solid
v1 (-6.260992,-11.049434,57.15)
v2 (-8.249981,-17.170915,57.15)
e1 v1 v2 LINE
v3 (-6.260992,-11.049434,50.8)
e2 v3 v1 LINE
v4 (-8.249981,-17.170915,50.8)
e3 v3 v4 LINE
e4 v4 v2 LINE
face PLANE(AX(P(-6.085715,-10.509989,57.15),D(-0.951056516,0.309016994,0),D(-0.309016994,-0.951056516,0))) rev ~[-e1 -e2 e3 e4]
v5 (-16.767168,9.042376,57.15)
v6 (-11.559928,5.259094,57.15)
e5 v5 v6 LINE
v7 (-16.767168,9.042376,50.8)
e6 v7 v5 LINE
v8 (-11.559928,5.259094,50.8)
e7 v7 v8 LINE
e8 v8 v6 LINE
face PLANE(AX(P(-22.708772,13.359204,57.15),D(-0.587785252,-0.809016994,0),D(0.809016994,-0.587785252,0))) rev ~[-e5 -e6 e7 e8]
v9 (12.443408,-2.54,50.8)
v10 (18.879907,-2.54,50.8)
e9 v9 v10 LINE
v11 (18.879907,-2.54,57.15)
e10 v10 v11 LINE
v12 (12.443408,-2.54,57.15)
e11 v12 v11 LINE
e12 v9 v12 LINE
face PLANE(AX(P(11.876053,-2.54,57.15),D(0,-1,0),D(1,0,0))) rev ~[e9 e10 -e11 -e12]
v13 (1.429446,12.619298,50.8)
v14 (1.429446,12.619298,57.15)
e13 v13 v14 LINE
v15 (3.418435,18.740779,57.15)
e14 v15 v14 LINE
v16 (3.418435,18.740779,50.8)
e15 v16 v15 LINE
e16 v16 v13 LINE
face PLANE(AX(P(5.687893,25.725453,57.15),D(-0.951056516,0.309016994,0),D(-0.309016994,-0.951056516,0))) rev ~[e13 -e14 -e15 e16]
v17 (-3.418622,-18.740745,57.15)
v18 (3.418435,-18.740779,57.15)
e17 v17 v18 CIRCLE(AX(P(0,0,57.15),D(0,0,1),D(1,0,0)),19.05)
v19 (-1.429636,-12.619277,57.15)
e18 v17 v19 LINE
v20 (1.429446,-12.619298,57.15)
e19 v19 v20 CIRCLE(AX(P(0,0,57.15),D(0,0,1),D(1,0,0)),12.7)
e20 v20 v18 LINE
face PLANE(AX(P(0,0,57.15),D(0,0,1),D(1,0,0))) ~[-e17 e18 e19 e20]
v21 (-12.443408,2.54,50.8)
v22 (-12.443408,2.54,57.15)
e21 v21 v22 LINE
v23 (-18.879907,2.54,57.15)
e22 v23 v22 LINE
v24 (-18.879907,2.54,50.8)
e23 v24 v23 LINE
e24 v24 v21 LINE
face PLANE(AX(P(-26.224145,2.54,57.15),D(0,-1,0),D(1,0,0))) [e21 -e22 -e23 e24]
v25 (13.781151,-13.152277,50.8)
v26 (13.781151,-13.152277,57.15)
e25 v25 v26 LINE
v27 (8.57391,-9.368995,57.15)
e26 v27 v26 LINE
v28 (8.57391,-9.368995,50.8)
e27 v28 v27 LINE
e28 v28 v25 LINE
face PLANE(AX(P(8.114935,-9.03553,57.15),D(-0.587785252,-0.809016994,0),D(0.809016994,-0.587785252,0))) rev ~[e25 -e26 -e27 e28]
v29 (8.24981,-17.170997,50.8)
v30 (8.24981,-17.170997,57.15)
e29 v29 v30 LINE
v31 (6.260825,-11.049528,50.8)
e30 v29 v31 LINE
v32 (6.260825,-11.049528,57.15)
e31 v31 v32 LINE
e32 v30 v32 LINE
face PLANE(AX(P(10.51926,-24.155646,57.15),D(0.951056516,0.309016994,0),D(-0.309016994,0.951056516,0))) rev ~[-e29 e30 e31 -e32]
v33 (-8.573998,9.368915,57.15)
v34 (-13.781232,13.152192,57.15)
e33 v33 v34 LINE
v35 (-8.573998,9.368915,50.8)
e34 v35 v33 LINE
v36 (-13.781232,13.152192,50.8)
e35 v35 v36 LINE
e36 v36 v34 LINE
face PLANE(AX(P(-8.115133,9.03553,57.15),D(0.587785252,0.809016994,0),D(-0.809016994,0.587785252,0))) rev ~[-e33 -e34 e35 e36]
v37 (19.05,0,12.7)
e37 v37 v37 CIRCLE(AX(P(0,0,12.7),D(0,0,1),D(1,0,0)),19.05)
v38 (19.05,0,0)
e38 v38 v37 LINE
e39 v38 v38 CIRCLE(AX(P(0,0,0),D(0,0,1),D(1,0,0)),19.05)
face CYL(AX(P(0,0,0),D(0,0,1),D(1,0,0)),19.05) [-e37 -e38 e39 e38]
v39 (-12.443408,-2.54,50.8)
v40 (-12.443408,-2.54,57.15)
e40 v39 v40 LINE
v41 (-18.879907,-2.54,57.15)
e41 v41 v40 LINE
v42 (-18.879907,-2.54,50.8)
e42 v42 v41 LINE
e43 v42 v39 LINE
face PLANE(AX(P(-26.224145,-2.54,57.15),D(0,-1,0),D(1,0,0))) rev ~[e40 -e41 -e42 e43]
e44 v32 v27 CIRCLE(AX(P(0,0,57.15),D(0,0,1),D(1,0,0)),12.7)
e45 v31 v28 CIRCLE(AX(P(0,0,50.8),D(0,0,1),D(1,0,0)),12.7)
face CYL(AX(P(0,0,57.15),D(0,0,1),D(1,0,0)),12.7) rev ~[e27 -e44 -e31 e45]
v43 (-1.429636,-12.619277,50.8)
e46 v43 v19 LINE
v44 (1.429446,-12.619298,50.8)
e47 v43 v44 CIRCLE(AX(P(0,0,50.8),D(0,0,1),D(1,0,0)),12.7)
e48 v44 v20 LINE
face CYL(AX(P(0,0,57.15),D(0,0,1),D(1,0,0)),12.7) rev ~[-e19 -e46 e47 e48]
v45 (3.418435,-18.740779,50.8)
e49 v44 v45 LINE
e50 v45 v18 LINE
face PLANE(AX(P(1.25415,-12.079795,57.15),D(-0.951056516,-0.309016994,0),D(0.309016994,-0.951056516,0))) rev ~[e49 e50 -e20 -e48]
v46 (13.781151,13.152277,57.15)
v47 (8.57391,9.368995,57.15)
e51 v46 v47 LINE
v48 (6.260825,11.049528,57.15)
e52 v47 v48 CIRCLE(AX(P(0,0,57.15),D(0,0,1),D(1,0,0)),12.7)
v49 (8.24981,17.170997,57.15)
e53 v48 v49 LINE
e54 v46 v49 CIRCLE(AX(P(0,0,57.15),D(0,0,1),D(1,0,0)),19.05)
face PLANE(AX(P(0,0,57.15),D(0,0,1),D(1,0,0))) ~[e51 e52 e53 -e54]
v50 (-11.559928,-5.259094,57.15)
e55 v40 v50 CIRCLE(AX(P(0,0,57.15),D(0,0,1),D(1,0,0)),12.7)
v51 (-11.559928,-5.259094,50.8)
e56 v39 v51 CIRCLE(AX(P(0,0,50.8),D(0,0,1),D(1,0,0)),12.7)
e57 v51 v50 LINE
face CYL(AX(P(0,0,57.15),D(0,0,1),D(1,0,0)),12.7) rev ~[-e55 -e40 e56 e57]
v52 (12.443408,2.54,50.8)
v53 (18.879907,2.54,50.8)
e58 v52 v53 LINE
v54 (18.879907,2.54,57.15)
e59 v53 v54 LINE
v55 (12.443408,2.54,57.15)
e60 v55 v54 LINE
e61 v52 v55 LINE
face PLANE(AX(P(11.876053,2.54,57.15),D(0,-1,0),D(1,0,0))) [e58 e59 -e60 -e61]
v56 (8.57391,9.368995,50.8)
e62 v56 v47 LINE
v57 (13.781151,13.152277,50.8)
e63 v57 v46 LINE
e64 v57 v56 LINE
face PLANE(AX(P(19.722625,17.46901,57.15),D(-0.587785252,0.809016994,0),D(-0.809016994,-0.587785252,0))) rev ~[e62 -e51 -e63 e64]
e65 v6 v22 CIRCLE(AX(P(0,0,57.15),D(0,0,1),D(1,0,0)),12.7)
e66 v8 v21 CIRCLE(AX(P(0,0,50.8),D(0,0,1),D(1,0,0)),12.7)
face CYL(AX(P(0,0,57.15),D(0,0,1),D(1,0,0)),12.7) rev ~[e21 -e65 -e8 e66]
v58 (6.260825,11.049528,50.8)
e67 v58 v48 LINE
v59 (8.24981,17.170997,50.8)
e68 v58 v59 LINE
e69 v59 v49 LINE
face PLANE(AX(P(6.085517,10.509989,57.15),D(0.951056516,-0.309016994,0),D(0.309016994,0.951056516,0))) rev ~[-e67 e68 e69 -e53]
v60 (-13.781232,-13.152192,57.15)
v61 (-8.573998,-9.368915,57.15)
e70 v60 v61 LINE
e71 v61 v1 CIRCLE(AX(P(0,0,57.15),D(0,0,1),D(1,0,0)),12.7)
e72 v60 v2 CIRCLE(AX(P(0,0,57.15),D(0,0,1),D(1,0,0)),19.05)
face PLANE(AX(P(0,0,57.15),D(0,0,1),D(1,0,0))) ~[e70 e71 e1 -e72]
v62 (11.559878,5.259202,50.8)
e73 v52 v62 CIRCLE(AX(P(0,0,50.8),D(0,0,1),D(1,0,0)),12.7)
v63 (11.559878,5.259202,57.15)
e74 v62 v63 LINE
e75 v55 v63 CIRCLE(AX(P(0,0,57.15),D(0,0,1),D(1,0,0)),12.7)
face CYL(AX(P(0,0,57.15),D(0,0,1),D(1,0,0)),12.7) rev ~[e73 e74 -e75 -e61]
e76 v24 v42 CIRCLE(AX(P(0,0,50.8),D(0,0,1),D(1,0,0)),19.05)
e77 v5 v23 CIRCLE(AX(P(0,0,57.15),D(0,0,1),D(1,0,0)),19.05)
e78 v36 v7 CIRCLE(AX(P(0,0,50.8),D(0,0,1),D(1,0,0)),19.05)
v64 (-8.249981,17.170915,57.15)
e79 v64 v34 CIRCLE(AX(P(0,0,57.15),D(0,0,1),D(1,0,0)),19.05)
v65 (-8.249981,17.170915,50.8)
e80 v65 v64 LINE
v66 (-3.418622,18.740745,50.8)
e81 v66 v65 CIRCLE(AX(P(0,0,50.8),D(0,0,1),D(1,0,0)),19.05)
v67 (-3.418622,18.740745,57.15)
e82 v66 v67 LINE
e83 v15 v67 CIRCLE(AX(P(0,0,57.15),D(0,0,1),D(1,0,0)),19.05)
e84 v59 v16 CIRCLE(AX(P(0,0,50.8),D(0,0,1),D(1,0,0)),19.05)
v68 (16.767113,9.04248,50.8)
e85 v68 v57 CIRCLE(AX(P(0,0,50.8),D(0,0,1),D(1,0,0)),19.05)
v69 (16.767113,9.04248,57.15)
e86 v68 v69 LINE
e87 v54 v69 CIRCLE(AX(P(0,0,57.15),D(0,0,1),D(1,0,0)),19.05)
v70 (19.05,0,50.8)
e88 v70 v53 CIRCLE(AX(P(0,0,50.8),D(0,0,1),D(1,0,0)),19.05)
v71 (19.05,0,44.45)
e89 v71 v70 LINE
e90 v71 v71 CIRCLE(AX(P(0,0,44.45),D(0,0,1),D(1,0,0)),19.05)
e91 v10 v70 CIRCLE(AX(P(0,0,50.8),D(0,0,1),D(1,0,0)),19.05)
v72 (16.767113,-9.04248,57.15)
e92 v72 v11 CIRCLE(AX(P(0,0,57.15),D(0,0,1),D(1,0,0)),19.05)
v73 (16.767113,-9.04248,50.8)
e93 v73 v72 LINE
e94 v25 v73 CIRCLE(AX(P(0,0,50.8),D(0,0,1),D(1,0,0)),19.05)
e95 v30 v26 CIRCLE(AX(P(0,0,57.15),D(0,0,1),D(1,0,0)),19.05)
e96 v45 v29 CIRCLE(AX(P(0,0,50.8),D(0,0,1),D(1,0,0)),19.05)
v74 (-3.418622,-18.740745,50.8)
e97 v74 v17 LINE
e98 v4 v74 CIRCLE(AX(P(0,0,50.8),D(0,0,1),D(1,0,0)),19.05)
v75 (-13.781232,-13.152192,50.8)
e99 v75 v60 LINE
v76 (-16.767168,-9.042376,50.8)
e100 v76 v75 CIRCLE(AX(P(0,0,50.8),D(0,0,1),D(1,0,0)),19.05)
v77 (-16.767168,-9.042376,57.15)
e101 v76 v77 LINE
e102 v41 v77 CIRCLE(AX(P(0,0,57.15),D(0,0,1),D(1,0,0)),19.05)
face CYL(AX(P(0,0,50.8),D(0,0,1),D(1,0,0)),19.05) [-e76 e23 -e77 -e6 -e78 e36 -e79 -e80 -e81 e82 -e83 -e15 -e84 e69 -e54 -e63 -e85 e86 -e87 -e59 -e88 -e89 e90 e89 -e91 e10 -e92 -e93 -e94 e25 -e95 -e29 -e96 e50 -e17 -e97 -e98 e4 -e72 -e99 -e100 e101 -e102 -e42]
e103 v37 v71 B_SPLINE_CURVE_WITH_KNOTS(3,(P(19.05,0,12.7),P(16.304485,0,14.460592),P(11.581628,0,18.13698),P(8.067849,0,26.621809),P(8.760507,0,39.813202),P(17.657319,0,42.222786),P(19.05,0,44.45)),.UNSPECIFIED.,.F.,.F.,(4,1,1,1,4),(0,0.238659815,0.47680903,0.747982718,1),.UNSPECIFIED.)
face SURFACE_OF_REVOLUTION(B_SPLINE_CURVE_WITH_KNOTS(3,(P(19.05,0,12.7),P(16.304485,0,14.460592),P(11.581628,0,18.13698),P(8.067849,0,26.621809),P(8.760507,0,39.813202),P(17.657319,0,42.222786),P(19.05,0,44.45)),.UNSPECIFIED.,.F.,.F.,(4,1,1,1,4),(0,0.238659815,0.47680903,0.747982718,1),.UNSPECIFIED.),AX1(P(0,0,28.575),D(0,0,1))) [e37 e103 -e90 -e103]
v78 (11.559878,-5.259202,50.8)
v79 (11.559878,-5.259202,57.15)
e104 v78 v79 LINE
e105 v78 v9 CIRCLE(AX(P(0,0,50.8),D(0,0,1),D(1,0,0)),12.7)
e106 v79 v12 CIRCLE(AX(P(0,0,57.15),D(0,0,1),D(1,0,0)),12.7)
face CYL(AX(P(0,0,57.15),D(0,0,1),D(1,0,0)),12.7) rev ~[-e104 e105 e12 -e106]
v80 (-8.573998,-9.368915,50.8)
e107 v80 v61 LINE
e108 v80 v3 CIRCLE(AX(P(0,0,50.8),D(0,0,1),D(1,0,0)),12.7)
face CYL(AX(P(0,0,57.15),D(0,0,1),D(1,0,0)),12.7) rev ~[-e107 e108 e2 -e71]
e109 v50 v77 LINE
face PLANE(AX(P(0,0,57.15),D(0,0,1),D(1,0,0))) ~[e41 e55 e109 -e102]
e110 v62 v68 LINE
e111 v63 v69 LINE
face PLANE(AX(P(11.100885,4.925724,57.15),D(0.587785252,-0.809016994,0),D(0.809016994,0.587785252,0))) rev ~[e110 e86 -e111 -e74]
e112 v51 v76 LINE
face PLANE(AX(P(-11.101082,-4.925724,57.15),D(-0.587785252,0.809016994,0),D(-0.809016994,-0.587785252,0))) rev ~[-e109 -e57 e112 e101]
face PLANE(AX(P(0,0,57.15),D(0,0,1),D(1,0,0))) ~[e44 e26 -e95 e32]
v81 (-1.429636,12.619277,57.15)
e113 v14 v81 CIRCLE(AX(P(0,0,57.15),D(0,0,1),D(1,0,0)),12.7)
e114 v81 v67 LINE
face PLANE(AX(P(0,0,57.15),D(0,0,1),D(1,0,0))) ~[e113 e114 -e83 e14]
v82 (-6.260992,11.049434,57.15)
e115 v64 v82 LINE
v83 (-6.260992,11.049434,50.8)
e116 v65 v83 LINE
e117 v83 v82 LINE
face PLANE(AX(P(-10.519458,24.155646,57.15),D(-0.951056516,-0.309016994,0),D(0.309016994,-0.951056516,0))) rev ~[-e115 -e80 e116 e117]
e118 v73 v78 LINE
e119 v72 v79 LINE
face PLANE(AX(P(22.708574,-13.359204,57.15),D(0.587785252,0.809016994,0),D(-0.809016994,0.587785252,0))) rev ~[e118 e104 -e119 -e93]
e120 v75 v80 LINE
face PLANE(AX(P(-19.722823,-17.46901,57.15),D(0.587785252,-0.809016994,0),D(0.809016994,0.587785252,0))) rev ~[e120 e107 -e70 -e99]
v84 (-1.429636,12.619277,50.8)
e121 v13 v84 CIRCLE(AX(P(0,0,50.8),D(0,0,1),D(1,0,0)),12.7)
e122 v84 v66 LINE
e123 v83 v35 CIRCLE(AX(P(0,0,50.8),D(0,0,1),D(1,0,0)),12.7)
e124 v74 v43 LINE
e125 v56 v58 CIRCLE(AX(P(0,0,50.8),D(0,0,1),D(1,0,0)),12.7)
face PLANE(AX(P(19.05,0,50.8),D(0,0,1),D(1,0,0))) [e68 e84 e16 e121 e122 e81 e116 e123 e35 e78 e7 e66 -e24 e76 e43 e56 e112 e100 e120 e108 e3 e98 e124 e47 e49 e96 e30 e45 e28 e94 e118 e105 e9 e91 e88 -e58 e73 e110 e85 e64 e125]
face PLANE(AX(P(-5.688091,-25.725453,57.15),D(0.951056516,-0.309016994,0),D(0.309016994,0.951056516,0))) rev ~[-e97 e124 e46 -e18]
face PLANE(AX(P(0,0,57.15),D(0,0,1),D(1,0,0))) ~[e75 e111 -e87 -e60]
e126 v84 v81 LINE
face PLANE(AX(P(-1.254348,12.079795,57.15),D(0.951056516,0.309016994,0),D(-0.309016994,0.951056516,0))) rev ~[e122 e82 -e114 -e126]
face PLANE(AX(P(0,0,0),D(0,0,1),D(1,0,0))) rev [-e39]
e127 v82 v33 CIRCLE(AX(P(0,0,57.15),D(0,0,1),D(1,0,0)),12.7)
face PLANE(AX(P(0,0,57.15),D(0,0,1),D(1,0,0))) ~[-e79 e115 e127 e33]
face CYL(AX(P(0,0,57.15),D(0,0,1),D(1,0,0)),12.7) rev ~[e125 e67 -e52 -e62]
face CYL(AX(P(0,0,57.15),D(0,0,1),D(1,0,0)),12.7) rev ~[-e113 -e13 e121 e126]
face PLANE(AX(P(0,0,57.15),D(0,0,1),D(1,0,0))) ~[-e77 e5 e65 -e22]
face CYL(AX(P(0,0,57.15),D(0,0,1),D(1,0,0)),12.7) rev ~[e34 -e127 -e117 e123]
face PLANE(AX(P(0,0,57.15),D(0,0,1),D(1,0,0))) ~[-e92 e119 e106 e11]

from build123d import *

# Parameters (mm, degrees)
F0_W     = 19.05
F0_H     = 12.7
F2_R     = 12.7
F3_DEPTH = 6.35
F4_W     = 14.3478936436
F4_H     = 5.08
F5_DEPTH = 6.35


# Not quite as in the source:
# - a feature of the source that left no trace in its solid (it failed there, or was rolled back) is left out


with BuildPart() as f1:
    # F0 (on Front) → F1 (revolve)
    with BuildSketch(Plane.XZ):
        with Locations((9.525, 50.8)):
            Rectangle(F0_W, F0_H)
        with BuildLine():
            Line((0, 44.45), (0, 0))
            Line((0, 0), (19.05, 0))
            Line((19.05, 0), (19.05, 12.7))
            add(Edge.make_bspline(
                [(19.05, 12.7), (16.3044854864, 14.4605922783), (11.5816284357, 18.1369797007), (8.0678489786, 26.6218092545), (8.7605074506, 39.8132017689), (17.6573194939, 42.2227860015), (19.05, 44.45)],
                knots=[0, 0, 0, 0, 0.2386598147, 0.4768090303, 0.7479827182, 1, 1, 1, 1], degree=3))
            Line((19.05, 44.45), (0, 44.45))
        make_face()
    revolve(axis=Axis((0, 0, 28.575), (0, 0, 1)))

    # F2 (on face) → F3 (cut)
    with BuildSketch(Plane.XY.offset(57.15)):
        Circle(F2_R)
    extrude(amount=-F3_DEPTH, mode=Mode.SUBTRACT)

    # F4 (on face) → F5 (cut)
    with BuildSketch(Plane.XY.offset(57.15)):
        with Locations((19.05, 0)):
            Rectangle(F4_W, F4_H)
        Polygon((11.1008845043, 4.9257238661), (22.7085742955, 13.3592041513), (19.7226252138, 17.4690104828), (8.1149354226, 9.0355301976), align=None)
        Polygon((6.0855174874, 10.5099886346), (10.5192604568, 24.1556463795), (5.687893354, 25.7254527109), (1.2541503846, 12.079794966), align=None)
        Polygon((-1.2543481381, 12.079794966), (-5.6880911074, 25.7254527109), (-10.5194582102, 24.1556463795), (-6.0857152409, 10.5099886346), align=None)
        Polygon((-8.1151331761, 9.0355301976), (-19.7228229673, 17.4690104828), (-22.7087720489, 13.3592041513), (-11.1010822577, 4.9257238661), align=None)
        with Locations((-19.0501977534, 0)):
            Rectangle(F4_W, F4_H)
        Polygon((-11.1010822577, -4.9257238661), (-22.7087720489, -13.3592041513), (-19.7228229673, -17.4690104828), (-8.1151331761, -9.0355301976), align=None)
        Polygon((-6.0857152409, -10.5099886346), (-10.5194582102, -24.1556463795), (-5.6880911074, -25.7254527109), (-1.2543481381, -12.079794966), align=None)
        Polygon((1.2541503846, -12.079794966), (5.687893354, -25.7254527109), (10.5192604568, -24.1556463795), (6.0855174874, -10.5099886346), align=None)
        Polygon((8.1149354226, -9.0355301976), (19.7226252138, -17.4690104828), (22.7085742955, -13.3592041513), (11.1008845043, -4.9257238661), align=None)
    extrude(amount=-F5_DEPTH, mode=Mode.SUBTRACT)


solid = f1.part
